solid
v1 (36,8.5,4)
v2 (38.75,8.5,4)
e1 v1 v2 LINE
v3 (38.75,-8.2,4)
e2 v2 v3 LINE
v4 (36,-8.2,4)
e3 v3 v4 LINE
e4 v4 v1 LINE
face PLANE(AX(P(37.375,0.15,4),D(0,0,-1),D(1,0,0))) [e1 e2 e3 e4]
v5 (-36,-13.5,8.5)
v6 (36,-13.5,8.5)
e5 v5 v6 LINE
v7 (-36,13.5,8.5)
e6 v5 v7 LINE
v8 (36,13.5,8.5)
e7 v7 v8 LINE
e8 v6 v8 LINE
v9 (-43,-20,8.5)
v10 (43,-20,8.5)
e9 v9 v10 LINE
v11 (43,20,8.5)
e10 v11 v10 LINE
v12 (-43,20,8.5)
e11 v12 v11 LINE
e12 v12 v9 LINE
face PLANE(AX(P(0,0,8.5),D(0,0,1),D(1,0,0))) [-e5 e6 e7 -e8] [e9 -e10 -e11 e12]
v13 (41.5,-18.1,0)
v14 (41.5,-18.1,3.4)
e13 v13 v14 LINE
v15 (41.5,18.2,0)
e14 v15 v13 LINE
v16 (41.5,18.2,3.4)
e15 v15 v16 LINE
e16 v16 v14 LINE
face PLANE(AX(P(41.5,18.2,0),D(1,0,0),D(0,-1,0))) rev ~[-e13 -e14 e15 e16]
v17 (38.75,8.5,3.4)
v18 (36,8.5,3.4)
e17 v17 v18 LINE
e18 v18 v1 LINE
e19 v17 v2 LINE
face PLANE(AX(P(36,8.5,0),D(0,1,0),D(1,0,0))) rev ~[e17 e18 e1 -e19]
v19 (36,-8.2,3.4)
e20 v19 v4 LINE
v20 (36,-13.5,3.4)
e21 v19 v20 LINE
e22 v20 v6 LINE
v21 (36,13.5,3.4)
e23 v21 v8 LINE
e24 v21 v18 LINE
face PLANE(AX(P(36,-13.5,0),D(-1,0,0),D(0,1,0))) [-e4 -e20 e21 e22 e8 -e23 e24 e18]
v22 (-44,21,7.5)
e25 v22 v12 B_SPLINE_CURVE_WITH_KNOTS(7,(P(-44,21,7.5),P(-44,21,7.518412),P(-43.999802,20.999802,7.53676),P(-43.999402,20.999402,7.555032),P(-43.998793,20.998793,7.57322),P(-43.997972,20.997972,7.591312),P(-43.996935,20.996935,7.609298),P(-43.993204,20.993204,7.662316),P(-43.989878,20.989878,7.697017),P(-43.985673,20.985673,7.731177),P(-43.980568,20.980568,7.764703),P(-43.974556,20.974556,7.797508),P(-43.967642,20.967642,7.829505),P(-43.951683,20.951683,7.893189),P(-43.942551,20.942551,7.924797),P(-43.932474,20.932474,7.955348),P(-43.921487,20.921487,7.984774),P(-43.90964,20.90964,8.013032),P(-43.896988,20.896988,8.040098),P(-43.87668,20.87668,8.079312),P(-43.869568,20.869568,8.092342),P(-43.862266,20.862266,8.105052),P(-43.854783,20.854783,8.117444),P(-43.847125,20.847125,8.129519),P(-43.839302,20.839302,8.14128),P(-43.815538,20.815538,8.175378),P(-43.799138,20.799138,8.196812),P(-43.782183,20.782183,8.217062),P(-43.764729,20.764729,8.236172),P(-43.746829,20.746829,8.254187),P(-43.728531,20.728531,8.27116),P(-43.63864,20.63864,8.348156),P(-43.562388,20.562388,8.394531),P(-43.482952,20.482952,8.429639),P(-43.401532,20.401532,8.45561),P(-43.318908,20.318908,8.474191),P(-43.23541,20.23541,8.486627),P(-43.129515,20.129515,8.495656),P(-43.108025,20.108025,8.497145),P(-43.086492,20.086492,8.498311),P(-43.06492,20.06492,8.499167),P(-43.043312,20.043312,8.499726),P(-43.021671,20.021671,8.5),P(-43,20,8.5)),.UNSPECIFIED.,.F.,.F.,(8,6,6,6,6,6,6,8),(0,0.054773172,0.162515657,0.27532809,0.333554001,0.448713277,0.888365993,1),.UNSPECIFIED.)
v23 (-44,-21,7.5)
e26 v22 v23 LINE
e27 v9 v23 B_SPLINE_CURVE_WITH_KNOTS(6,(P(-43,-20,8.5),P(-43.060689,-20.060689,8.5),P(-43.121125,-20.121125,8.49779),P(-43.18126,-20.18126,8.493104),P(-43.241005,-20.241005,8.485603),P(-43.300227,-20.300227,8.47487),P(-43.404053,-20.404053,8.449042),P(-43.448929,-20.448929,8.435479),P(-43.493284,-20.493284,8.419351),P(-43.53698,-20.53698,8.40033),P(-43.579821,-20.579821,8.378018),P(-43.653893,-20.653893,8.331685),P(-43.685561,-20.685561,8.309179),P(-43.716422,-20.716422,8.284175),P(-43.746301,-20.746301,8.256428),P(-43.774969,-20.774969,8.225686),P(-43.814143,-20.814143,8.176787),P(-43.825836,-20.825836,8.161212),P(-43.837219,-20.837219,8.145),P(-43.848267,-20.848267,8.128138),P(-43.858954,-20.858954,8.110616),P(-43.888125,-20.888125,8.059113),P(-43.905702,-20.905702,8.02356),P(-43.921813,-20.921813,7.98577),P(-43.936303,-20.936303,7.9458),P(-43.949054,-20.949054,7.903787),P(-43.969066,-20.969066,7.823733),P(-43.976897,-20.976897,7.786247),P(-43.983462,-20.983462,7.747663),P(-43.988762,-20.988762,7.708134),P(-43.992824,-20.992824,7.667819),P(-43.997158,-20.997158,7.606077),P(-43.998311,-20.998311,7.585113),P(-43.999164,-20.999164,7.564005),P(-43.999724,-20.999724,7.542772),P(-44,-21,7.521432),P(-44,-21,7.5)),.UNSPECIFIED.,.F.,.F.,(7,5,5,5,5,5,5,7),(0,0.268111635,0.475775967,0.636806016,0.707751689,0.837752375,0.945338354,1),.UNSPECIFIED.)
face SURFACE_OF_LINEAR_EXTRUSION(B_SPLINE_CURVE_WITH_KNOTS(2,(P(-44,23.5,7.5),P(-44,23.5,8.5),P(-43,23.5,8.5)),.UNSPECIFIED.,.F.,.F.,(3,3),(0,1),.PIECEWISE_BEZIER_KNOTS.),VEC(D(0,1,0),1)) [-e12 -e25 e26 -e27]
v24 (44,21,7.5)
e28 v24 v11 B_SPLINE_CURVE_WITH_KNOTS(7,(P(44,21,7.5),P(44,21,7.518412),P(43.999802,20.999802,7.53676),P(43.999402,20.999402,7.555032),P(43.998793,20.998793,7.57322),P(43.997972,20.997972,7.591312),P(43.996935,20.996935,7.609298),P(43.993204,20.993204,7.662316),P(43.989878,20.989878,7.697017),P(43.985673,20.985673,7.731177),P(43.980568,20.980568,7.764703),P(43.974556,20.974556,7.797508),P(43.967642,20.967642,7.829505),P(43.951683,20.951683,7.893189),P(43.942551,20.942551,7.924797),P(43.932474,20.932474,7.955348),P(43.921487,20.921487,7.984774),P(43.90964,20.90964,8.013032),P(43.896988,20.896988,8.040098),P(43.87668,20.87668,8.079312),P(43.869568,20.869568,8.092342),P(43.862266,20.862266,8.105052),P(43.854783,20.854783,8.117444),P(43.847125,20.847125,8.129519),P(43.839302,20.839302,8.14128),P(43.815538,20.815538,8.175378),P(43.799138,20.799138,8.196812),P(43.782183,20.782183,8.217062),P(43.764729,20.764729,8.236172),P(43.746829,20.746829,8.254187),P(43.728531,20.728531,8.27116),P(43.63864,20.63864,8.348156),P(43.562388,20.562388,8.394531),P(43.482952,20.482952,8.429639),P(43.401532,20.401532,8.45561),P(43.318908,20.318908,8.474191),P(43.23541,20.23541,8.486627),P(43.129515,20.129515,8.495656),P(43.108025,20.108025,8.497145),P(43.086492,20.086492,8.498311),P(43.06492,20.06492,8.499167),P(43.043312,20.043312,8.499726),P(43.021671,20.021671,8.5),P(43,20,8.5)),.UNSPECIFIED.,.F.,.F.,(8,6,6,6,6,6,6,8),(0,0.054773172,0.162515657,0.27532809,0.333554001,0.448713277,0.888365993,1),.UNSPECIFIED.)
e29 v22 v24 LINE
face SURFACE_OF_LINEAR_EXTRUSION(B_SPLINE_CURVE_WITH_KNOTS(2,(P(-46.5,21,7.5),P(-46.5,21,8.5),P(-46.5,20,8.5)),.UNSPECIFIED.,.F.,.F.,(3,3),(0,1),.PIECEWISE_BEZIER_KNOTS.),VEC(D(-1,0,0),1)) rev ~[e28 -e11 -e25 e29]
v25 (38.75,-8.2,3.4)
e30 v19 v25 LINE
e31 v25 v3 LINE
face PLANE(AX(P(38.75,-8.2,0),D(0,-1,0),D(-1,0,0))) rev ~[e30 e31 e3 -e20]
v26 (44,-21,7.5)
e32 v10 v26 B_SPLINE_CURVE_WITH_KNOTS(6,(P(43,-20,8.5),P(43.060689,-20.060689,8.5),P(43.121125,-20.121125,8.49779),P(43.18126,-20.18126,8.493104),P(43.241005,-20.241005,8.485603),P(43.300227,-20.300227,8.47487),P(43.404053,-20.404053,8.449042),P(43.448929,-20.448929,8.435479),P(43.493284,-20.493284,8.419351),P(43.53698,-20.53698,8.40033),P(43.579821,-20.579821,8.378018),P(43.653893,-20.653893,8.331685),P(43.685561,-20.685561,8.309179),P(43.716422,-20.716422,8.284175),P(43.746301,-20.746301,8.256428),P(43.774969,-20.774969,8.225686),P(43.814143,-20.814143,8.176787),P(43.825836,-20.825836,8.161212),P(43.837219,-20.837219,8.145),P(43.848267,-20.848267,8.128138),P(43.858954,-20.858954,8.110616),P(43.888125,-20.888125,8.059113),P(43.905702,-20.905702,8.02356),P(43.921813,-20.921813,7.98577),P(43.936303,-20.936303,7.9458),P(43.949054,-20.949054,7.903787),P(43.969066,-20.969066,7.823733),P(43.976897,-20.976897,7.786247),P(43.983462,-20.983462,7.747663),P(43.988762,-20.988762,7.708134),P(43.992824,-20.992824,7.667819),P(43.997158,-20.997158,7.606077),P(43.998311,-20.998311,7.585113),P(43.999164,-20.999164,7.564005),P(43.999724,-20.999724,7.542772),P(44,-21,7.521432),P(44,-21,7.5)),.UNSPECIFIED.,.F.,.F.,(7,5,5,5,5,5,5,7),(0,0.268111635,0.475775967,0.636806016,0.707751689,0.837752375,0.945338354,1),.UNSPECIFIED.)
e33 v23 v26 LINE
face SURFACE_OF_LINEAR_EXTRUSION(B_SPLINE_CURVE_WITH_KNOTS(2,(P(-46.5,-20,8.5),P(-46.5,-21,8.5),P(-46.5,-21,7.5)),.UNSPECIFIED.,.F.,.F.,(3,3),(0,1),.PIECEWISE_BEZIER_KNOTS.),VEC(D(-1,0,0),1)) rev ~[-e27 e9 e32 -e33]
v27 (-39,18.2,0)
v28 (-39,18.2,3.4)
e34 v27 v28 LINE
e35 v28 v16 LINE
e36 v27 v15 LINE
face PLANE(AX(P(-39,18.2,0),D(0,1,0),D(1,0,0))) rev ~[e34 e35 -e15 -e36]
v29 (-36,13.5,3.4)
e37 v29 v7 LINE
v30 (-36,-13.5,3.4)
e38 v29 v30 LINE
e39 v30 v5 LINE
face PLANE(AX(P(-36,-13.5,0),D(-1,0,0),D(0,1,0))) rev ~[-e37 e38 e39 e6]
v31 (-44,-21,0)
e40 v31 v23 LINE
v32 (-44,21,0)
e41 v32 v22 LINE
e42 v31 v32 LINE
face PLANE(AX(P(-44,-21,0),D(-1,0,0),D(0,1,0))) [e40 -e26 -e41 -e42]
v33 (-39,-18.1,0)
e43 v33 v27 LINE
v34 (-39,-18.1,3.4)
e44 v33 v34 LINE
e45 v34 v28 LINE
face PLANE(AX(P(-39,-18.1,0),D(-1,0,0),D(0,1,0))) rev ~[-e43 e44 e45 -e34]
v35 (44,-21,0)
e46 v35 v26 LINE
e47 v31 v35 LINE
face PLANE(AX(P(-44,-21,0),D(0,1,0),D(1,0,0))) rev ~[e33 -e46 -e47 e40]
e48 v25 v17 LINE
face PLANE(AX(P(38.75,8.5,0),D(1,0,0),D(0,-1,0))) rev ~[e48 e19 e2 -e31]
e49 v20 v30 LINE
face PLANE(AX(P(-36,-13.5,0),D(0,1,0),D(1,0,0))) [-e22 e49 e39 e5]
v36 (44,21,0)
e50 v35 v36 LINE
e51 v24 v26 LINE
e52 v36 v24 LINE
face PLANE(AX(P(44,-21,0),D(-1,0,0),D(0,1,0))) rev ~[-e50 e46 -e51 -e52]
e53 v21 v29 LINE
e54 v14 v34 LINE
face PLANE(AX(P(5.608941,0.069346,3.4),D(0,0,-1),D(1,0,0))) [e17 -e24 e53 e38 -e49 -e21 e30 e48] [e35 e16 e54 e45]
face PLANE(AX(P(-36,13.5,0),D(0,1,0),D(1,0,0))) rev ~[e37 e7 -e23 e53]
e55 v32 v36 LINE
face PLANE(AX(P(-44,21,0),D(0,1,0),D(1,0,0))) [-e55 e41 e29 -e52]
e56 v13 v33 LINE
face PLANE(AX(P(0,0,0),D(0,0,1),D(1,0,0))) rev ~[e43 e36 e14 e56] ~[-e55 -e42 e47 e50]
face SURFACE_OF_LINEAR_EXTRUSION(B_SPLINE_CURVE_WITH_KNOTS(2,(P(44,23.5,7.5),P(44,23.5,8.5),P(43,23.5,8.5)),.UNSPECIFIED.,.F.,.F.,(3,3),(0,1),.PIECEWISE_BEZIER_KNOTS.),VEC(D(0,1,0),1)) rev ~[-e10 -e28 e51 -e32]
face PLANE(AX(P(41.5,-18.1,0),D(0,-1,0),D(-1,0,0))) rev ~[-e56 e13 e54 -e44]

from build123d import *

# Parameters (mm, degrees)
F0_W        = 88
F0_H        = 42
F0_W_2      = 72
F0_H_2      = 27
F1_DEPTH    = 8.5
F3_DEPTH    = 4
F2_W        = 2.75
F2_H        = 5.9
F4_DEPTH    = 3.4
F5_T1_DEPTH = 93
F5_T3_DEPTH = 47


# Not quite as in the source:
# - a fillet or chamfer that OpenCascade refuses, or shapes differently, is made with other operations: its cross-section is extruded or revolved along the edge and cut away or added


with BuildPart() as f1:
    # F0 (on Top) → F1 (new body)
    with BuildSketch(Plane.XY):
        Rectangle(F0_W, F0_H)
        Rectangle(F0_W_2, F0_H_2, mode=Mode.SUBTRACT)
    extrude(amount=F1_DEPTH)

    # F2 (on face) → F3 (cut)
    with BuildSketch(Plane(origin=(0, 0, 0), x_dir=(1, 0, 0), z_dir=(0, 0, -1))):
        Polygon((38.75, 8.2), (36, 8.2), (36, -8.5), (38.75, -8.5), (38.75, -2.8), (38.75, 3.1), align=None)
    extrude(amount=-F3_DEPTH, mode=Mode.SUBTRACT)

    # F2 (on face) → F4 (cut)
    with BuildSketch(Plane(origin=(0, 0, 0), x_dir=(1, 0, 0), z_dir=(0, 0, -1))):
        Polygon((36, -8.5), (36, 8.2), (38.75, 8.2), (38.75, 3.1), (41.5, 3.1), (41.5, 18.1), (-39, 18.1), (-39, -18.2), (41.5, -18.2), (41.5, -2.8), (38.75, -2.8), (38.75, -8.5), align=None)
        with Locations((40.125, 0.15)):
            Rectangle(F2_W, F2_H)
    extrude(amount=-F4_DEPTH, mode=Mode.SUBTRACT)

    # F5: fillet of radius 1 on 4 edges, made by hand

    # F5_s2 → F5_t1 (cut)
    with BuildSketch(Plane.YZ.offset(-46.5)):
        with BuildLine():
            add(Edge.make_bspline(
                [(-20, 8.5), (-21, 8.5), (-21, 7.5)],
                knots=[0, 0, 0, 1, 1, 1], degree=2, weights=[1, 1, 1]))
            Line((-21, 7.5), (-21, 8.5))
            Line((-21, 8.5), (-20, 8.5))
        make_face()
        with BuildLine():
            add(Edge.make_bspline(
                [(21, 7.5), (21, 8.5), (20, 8.5)],
                knots=[0, 0, 0, 1, 1, 1], degree=2, weights=[1, 1, 1]))
            Line((20, 8.5), (21, 8.5))
            Line((21, 8.5), (21, 7.5))
        make_face()
    extrude(amount=F5_T1_DEPTH, mode=Mode.SUBTRACT)

    # F5_s4 → F5_t3 (cut)
    with BuildSketch(Plane.XZ.offset(-23.5)):
        with BuildLine():
            add(Edge.make_bspline(
                [(44, 7.5), (44, 8.5), (43, 8.5)],
                knots=[0, 0, 0, 1, 1, 1], degree=2, weights=[1, 1, 1]))
            Line((43, 8.5), (44, 8.5))
            Line((44, 8.5), (44, 7.5))
        make_face()
        with BuildLine():
            add(Edge.make_bspline(
                [(-44, 7.5), (-44, 8.5), (-43, 8.5)],
                knots=[0, 0, 0, 1, 1, 1], degree=2, weights=[1, 1, 1]))
            Line((-43, 8.5), (-44, 8.5))
            Line((-44, 8.5), (-44, 7.5))
        make_face()
    extrude(amount=F5_T3_DEPTH, mode=Mode.SUBTRACT)


solid = f1.part
